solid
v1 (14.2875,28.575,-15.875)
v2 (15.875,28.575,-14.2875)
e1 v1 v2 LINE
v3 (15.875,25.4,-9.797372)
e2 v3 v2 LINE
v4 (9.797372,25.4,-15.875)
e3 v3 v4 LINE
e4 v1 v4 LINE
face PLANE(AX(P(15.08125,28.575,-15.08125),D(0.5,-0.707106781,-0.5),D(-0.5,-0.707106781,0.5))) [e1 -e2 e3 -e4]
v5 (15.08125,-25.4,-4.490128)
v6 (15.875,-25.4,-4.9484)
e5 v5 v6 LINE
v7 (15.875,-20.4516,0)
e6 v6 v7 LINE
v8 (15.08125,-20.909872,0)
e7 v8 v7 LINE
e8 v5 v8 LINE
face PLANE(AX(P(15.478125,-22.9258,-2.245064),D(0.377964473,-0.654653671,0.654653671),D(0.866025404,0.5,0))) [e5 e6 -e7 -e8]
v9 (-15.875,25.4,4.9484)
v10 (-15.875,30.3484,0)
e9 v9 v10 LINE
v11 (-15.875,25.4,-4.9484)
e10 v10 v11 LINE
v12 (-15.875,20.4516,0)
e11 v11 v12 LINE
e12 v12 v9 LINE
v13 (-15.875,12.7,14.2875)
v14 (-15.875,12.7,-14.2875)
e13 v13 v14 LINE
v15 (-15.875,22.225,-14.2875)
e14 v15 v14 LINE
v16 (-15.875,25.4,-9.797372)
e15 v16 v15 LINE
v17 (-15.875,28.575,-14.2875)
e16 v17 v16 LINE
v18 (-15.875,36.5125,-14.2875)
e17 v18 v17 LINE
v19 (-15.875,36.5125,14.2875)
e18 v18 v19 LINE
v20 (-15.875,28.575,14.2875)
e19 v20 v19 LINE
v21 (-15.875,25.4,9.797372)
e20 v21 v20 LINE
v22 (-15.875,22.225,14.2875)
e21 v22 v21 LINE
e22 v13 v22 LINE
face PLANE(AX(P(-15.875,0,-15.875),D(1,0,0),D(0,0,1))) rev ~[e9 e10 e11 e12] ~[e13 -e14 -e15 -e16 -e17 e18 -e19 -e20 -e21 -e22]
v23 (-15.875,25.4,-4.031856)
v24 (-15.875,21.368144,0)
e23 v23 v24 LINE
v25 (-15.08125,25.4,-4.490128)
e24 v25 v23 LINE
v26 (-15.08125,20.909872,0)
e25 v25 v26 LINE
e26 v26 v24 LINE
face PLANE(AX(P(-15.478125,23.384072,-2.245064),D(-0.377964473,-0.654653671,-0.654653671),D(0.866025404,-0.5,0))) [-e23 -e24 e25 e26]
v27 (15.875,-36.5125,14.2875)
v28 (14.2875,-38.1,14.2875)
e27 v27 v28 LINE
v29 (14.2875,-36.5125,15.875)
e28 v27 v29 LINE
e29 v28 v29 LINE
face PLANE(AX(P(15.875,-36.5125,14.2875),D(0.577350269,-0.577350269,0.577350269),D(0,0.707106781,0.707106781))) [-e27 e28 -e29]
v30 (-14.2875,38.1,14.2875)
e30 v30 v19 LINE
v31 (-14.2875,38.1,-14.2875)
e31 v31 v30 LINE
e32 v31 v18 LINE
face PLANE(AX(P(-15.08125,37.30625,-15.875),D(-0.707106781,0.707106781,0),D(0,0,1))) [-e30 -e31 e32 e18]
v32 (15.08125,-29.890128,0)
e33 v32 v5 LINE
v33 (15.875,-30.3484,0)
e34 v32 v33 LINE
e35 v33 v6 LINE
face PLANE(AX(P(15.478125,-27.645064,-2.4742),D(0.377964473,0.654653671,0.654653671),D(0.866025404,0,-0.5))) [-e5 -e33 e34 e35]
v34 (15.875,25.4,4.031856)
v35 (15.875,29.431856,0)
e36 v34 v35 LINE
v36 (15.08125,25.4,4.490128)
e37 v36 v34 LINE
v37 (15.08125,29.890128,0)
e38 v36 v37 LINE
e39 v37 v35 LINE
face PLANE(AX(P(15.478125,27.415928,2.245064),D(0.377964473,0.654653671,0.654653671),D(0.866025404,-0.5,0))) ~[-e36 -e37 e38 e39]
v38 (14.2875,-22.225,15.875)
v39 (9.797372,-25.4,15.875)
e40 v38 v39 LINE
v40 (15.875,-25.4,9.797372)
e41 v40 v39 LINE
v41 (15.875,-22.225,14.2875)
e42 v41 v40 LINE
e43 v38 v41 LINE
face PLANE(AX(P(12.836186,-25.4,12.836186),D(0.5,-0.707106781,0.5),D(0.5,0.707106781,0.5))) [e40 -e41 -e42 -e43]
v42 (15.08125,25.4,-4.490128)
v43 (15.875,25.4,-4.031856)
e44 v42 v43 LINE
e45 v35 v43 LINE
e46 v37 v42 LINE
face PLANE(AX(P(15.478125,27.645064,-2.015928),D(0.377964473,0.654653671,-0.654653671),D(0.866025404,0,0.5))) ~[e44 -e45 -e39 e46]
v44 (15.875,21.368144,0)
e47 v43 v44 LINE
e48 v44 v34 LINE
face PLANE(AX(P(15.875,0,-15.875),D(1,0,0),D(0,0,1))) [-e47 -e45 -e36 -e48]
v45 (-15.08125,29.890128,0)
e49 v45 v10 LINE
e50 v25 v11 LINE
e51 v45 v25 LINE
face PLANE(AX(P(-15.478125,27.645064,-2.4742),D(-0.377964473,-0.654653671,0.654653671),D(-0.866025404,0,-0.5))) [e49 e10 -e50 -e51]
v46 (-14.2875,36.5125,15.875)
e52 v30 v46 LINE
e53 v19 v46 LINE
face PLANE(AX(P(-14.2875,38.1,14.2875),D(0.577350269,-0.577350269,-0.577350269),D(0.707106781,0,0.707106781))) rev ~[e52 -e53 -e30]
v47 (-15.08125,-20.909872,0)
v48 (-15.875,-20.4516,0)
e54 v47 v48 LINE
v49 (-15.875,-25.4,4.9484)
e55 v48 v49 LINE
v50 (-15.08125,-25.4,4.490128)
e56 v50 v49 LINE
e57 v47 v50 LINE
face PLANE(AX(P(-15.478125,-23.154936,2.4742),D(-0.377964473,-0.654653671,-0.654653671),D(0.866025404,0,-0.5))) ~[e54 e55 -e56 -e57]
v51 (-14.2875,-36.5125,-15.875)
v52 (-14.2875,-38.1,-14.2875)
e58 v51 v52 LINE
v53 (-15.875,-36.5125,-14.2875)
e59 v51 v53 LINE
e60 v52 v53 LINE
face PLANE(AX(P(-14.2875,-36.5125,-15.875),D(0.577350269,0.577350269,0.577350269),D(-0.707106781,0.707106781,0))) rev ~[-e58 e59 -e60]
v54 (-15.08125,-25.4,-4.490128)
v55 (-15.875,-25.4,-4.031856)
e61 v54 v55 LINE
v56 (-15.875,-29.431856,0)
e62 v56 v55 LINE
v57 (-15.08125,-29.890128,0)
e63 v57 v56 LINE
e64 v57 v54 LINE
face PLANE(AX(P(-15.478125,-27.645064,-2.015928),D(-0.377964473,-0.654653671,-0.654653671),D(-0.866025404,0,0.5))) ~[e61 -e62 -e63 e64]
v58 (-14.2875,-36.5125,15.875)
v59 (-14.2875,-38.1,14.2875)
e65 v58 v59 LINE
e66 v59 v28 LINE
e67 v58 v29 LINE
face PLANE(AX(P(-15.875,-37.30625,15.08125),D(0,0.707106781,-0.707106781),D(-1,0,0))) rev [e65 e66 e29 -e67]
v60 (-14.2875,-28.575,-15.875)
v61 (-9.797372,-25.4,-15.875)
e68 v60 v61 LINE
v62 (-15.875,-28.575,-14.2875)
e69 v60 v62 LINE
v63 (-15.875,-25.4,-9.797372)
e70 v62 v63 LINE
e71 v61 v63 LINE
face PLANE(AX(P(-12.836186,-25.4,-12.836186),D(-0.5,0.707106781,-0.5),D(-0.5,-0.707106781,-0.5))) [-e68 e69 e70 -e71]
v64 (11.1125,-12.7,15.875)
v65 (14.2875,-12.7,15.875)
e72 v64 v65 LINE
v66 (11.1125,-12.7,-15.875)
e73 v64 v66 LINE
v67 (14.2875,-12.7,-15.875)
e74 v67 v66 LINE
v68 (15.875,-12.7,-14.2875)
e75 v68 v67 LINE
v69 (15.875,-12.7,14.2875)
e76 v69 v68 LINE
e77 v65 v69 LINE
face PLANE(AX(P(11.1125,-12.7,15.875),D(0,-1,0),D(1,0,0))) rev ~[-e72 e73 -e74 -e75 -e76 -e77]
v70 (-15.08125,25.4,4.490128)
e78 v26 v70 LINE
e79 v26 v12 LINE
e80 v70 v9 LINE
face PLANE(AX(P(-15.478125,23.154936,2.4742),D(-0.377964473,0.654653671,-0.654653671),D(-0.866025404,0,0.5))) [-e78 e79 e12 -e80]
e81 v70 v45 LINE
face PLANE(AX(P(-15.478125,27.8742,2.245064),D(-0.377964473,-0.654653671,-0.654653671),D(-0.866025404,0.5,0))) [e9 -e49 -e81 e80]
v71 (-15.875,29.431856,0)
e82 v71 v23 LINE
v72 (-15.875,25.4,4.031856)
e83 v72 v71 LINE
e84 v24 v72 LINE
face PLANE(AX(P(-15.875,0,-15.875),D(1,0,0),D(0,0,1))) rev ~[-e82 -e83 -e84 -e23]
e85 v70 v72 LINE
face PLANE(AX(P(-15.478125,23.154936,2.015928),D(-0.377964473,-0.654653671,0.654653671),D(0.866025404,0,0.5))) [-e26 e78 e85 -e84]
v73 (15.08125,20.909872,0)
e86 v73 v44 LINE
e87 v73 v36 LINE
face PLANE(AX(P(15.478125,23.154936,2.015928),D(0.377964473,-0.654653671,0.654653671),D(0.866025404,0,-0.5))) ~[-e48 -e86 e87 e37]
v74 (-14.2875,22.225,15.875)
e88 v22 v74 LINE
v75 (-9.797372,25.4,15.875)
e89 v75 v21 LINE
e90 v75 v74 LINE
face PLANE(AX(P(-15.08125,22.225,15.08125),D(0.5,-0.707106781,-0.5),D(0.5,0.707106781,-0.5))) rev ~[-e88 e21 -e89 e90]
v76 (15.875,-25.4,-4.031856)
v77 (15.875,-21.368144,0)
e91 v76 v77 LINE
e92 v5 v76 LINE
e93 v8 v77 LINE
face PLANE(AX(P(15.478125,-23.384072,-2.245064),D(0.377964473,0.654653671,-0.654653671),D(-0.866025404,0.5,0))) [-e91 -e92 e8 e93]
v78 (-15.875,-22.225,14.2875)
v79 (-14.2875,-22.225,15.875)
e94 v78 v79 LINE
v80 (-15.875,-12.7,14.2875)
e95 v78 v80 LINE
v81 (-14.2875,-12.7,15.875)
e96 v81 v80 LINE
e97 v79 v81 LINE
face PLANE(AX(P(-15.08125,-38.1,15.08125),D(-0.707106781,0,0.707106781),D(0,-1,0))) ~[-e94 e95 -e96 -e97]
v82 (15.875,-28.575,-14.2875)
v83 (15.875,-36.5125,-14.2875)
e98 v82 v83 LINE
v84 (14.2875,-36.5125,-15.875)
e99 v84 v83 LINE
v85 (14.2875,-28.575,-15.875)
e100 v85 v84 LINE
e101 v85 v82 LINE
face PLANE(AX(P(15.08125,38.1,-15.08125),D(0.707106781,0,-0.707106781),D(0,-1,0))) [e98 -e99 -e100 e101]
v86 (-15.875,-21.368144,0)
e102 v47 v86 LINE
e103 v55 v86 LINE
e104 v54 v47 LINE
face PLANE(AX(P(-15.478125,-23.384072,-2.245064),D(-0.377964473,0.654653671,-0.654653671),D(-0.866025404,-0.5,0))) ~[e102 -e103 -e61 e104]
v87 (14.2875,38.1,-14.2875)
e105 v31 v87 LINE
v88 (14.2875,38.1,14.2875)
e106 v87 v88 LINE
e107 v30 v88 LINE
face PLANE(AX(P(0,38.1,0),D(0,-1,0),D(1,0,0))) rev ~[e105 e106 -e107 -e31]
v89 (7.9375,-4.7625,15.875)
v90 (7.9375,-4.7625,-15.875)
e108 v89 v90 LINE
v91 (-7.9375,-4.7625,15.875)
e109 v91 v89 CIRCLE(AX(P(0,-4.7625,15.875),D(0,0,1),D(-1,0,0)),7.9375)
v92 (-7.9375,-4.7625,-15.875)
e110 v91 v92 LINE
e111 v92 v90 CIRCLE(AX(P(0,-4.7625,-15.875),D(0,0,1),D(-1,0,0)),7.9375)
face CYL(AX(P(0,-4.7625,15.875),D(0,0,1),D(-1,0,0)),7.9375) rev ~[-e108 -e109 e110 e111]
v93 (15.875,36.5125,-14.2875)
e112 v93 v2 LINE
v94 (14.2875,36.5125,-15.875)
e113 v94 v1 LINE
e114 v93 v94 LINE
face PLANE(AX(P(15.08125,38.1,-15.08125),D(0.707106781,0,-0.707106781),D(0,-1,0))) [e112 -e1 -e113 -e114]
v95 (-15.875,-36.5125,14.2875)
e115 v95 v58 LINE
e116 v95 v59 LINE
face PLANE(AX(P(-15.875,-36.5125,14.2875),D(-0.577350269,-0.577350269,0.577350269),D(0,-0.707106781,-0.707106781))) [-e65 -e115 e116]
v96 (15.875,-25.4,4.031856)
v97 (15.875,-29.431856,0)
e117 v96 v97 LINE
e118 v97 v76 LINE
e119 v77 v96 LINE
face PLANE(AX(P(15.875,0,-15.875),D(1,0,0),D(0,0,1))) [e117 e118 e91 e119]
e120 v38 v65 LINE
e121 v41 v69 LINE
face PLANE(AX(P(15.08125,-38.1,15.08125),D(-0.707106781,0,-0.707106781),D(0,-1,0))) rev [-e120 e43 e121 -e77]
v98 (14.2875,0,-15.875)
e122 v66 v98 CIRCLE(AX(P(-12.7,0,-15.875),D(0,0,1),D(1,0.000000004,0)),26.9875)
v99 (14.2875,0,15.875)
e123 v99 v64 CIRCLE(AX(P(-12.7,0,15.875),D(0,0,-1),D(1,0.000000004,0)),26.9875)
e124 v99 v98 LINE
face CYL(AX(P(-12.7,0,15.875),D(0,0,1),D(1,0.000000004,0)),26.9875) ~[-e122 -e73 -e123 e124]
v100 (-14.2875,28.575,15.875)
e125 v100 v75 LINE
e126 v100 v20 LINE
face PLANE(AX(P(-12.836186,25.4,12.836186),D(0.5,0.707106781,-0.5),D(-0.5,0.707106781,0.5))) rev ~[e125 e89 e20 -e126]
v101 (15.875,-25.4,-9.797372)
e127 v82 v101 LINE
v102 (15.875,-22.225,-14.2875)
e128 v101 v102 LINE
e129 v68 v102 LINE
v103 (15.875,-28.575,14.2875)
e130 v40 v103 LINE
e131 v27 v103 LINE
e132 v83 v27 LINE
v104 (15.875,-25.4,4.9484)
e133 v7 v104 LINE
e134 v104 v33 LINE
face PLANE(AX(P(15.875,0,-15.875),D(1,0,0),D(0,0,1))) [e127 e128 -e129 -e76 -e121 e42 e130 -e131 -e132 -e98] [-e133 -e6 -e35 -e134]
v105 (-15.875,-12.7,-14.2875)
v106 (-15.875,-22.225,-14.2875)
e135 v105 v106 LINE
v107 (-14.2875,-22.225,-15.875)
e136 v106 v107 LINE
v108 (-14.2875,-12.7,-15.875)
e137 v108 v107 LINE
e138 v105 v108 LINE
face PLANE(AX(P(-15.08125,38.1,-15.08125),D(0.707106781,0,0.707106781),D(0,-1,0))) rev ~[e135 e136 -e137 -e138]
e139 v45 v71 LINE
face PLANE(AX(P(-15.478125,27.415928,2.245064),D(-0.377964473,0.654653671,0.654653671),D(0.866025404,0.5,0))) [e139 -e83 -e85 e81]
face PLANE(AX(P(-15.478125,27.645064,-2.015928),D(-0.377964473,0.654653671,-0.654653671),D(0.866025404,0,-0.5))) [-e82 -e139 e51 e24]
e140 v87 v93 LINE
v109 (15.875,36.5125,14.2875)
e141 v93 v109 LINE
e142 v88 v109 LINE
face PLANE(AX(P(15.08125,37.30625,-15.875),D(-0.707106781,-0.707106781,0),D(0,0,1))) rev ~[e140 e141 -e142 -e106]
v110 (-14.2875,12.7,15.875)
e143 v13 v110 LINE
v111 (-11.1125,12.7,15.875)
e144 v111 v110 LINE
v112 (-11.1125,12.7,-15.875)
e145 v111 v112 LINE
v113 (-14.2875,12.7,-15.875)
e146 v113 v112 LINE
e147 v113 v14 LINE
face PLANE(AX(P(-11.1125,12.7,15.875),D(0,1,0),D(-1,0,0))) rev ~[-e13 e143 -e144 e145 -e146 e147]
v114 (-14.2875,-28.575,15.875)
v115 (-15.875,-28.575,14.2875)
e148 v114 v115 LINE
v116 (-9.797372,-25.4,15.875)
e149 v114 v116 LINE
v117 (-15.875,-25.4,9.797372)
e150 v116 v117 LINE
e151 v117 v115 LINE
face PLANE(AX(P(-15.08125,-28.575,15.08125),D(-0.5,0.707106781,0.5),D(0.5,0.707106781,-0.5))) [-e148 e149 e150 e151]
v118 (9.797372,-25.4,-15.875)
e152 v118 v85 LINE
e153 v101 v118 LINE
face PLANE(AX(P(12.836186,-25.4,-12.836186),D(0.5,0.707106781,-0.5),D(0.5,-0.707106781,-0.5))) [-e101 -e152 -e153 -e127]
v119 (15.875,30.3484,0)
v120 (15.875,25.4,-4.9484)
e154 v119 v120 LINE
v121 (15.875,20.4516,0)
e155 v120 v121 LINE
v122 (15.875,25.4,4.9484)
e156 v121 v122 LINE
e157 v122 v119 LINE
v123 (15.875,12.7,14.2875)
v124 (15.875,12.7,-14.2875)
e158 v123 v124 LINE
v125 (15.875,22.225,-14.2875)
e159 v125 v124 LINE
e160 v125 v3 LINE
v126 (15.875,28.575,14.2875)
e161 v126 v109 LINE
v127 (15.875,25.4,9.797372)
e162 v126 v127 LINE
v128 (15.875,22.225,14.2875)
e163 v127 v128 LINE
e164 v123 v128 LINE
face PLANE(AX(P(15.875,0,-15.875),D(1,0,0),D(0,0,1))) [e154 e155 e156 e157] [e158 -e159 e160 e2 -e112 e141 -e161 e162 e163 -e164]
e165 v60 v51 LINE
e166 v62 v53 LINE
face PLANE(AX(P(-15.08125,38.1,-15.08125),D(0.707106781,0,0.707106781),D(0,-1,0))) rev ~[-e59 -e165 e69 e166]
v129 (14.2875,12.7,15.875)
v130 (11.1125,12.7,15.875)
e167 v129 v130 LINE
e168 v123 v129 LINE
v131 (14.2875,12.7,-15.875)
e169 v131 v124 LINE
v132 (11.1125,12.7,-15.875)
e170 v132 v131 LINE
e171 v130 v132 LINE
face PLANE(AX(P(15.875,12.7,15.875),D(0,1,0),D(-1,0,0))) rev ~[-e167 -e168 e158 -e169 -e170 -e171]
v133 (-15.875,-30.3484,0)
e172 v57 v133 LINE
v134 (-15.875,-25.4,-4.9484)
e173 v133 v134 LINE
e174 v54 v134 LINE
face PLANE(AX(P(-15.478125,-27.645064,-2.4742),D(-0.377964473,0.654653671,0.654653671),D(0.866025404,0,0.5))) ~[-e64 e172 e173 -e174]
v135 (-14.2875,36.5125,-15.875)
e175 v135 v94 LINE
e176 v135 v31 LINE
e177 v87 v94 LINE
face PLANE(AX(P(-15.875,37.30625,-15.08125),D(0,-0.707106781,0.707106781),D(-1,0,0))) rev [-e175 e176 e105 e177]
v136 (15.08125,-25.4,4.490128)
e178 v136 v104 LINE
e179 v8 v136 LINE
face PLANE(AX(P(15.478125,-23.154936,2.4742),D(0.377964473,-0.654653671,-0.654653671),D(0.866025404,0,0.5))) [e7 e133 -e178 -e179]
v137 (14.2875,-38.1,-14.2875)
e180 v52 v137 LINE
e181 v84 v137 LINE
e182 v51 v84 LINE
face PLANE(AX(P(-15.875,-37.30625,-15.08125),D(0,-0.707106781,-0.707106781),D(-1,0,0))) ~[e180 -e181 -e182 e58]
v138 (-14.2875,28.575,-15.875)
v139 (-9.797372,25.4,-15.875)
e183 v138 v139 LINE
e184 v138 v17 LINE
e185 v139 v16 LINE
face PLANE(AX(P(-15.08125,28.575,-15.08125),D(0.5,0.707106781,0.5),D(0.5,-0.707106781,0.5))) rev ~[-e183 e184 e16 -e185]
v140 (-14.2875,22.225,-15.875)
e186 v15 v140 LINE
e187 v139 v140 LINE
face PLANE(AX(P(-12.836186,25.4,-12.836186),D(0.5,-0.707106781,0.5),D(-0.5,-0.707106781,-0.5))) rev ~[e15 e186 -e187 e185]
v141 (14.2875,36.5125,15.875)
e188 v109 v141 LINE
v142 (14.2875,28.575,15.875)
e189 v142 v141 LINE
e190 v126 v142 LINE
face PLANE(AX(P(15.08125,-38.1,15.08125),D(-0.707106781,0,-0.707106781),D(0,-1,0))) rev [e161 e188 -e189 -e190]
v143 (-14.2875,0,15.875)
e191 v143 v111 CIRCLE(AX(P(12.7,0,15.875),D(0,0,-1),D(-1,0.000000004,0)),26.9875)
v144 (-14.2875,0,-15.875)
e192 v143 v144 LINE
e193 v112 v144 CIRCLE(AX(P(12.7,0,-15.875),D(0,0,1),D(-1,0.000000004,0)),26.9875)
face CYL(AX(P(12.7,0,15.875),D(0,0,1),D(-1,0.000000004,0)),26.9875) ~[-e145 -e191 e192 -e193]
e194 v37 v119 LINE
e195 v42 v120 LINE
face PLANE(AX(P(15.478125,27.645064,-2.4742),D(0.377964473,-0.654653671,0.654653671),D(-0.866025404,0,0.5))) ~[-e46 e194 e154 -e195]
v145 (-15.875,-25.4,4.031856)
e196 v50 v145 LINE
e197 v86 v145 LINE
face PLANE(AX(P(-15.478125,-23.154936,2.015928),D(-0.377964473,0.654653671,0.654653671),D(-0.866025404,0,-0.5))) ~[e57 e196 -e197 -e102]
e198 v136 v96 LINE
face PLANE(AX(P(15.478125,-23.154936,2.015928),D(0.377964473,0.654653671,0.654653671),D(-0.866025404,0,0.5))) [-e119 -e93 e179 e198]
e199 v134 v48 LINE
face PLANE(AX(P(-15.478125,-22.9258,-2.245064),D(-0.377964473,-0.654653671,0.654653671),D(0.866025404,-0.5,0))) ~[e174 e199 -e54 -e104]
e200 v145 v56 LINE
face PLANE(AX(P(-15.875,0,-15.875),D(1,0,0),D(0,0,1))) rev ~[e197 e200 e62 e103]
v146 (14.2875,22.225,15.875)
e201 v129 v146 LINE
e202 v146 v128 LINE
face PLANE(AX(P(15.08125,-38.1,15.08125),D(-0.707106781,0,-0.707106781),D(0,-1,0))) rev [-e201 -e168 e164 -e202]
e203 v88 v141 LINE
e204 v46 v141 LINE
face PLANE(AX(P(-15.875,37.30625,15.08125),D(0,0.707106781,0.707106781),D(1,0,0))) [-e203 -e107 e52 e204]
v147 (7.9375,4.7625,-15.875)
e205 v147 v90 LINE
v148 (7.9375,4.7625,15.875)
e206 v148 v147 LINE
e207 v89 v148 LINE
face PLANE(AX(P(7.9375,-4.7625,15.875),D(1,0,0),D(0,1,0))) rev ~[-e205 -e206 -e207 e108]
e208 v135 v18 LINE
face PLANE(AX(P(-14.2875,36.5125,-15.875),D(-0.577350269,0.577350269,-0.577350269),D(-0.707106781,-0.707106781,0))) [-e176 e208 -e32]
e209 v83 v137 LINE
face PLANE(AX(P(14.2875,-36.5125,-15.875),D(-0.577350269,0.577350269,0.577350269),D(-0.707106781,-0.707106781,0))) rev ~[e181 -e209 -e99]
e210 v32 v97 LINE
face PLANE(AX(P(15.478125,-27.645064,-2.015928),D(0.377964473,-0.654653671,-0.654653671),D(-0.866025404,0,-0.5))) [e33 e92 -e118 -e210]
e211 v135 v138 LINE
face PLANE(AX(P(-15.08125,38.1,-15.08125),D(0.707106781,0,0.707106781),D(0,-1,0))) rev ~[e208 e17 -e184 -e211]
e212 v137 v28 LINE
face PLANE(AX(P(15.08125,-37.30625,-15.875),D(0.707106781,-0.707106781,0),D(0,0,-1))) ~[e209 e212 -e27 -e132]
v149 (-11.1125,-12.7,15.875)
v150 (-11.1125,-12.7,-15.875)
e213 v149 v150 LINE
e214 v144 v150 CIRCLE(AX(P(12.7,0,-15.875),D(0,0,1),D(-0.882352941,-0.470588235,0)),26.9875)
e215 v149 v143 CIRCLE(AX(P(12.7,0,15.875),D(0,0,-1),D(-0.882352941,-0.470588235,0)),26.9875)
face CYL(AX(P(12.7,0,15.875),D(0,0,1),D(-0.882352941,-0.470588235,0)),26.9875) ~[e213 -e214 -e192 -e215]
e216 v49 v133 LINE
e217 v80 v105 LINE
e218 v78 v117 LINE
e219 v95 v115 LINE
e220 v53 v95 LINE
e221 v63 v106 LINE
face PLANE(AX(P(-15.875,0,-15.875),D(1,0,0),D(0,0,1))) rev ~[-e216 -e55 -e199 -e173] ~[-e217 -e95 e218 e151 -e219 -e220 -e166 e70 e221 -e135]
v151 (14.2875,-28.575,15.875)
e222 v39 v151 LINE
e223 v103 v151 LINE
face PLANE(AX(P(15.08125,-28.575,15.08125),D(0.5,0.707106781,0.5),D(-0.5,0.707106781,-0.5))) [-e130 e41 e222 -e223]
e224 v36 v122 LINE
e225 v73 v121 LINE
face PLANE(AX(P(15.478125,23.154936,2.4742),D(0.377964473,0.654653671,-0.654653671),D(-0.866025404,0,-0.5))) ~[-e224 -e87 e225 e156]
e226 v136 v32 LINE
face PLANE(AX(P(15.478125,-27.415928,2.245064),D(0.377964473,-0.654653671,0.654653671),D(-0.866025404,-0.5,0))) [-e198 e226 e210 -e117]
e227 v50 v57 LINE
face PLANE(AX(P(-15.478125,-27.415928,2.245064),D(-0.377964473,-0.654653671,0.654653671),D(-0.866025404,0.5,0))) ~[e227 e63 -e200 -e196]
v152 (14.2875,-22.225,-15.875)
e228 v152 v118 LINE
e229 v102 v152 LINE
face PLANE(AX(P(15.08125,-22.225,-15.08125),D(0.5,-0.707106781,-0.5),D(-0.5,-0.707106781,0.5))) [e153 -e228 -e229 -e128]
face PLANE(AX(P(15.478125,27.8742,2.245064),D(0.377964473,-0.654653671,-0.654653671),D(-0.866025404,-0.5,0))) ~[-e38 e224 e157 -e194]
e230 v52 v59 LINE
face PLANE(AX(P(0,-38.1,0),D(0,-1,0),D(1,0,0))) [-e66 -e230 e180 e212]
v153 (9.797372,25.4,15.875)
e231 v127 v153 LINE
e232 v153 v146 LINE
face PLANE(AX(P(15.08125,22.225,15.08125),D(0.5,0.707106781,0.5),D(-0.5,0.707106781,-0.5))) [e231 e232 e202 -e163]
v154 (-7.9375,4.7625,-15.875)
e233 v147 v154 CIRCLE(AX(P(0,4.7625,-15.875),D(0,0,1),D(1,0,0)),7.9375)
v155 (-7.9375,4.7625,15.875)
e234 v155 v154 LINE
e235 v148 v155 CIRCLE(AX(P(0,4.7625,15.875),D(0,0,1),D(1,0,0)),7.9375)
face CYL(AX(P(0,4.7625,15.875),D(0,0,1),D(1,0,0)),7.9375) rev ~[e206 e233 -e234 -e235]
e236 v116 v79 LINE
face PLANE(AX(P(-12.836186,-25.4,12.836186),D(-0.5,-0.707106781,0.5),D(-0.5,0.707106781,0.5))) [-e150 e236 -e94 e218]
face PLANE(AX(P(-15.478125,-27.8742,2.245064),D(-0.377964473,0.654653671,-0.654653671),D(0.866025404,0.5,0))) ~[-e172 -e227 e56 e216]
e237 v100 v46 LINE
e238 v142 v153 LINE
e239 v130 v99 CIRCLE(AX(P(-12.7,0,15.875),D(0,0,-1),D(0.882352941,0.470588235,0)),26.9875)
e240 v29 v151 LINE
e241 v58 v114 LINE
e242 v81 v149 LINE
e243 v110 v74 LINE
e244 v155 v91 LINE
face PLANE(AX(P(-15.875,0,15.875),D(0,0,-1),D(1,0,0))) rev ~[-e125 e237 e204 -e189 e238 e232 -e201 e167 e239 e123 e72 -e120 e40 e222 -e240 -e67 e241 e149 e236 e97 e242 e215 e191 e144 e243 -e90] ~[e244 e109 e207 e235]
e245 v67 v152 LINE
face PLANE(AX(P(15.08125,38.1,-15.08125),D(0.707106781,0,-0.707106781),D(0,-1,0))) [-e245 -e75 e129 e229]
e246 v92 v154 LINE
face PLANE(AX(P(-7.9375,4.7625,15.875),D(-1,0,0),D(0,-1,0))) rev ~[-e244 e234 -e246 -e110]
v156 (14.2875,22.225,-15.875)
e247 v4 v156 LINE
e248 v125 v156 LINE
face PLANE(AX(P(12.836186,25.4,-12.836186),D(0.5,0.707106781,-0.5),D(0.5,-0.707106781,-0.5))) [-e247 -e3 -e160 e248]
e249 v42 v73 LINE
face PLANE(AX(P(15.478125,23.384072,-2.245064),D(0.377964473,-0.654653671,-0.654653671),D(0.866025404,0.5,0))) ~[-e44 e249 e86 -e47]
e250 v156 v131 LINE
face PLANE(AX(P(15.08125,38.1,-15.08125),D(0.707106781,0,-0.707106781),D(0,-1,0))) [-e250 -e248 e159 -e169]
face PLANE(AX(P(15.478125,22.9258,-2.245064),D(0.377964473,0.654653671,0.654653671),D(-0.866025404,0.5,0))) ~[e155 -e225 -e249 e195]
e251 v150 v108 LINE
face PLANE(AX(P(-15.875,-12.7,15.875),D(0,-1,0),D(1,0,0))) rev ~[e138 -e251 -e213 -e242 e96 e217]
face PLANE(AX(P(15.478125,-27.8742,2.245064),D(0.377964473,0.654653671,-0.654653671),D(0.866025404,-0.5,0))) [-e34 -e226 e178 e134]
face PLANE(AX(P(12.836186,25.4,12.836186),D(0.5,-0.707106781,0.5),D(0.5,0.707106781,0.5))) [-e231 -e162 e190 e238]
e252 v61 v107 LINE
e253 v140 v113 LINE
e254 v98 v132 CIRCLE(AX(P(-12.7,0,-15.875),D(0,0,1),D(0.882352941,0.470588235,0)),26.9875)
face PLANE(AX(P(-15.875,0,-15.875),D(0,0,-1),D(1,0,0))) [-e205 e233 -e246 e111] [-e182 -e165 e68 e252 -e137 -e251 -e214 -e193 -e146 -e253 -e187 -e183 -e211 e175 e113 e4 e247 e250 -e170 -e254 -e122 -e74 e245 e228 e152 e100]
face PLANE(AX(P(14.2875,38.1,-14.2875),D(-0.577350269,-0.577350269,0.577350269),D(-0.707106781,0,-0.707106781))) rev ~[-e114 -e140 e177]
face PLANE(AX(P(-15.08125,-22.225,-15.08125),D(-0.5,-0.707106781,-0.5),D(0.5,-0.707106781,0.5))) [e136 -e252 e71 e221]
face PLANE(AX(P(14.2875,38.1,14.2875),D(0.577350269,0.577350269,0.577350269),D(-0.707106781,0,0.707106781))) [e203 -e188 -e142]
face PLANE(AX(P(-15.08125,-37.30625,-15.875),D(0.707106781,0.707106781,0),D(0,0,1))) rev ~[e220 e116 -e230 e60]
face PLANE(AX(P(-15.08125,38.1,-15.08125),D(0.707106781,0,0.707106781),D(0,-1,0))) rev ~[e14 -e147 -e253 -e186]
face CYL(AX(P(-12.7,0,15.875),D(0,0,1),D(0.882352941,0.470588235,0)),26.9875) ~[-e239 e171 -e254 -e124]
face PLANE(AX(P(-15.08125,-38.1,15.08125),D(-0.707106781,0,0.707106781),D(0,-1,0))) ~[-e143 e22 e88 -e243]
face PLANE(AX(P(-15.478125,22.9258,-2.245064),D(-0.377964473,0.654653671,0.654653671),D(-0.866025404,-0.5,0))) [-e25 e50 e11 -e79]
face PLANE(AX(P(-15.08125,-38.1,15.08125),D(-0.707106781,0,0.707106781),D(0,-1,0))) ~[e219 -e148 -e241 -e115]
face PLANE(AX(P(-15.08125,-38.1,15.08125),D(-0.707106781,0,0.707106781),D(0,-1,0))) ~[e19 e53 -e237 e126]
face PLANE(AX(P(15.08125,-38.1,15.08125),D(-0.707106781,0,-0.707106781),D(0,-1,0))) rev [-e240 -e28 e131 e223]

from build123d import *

# Parameters (mm, degrees)
F0_W              = 31.75
F0_H              = 31.75
F1_DEPTH          = 38.1
F2_SIZE           = 1.5875
F4_DEPTH          = 31.751
F7_DEPTH          = 12.7
F10_DEPTH         = 12.7
F13_COPIES2_COUNT = 2


# Not quite as in the source:
# - a pattern or mirror of a feature is missing from the dataset's text; its kind, count and spacing are read off the source's solid


with BuildPart() as f1:
    # F0 (on Front) → F1 (new body, symmetric)
    with BuildSketch(Plane.XZ):
        Rectangle(F0_W, F0_H)
    extrude(amount=F1_DEPTH, both=True)

    # F2
    f2_edges = [f1.edges().sort_by_distance(p)[0] for p in [
        (0, -38.1, 15.875),
        (15.875, -38.1, 0),
        (15.875, 0, 15.875),
        (15.875, 0, -15.875),
        (-15.875, 0, 15.875),
        (-15.875, -38.1, 0),
        (0, -38.1, -15.875),
        (15.875, 38.1, 0),
        (-15.875, 38.1, 0),
        (0, 38.1, -15.875),
        (-15.875, 0, -15.875),
        (0, 38.1, 15.875),
    ]]
    chamfer(f2_edges, length=F2_SIZE)

    # F3 (on face) → F4 (cut, through all)
    with BuildSketch(Plane.XY.offset(15.875)):
        with BuildLine():
            Line((11.1125, -12.7), (14.2875, -12.7))
            Line((14.2875, -12.7), (14.2875, 1.197e-07))
            ThreePointArc((14.2875, 1.197e-07), (13.4817207372, -6.5454301226), (11.1125, -12.7))
        make_face()
        Polygon((14.2875, 1.197e-07), (14.2875, -12.7), (15.875, -12.7), (15.875, 12.7), (14.2875, 12.7), align=None)
        with BuildLine():
            ThreePointArc((11.1125, 12.7), (13.4817207082, 6.5454302387), (14.2875, 1.197e-07))
            Line((14.2875, 1.197e-07), (14.2875, 12.7))
            Line((14.2875, 12.7), (11.1125, 12.7))
        make_face()
        Polygon((-15.875, -12.7), (-14.2875, -12.7), (-14.2875, 1.197e-07), (-14.2875, 12.7), (-15.875, 12.7), align=None)
        with BuildLine():
            Line((-14.2875, 1.197e-07), (-14.2875, -12.7))
            Line((-14.2875, -12.7), (-11.1125, -12.7))
            ThreePointArc((-11.1125, -12.7), (-13.4817207372, -6.5454301226), (-14.2875, 1.197e-07))
        make_face()
        with BuildLine():
            Line((-14.2875, 12.7), (-14.2875, 1.197e-07))
            ThreePointArc((-14.2875, 1.197e-07), (-13.4817207082, 6.5454302387), (-11.1125, 12.7))
            Line((-11.1125, 12.7), (-14.2875, 12.7))
        make_face()
        with BuildLine():
            Line((-7.9375, 4.7625), (-7.9375, -4.7625))
            ThreePointArc((-7.9375, -4.7625), (0, -12.7), (7.9375, -4.7625))
            Line((7.9375, -4.7625), (7.9375, 4.7625))
            ThreePointArc((7.9375, 4.7625), (0, 12.7), (-7.9375, 4.7625))
        make_face()
    extrude(amount=-F4_DEPTH, mode=Mode.SUBTRACT)

    # F6 (on face) → F7 (cut, symmetric)
    with BuildSketch(Plane(origin=(0, 0, 0), x_dir=(0, 1, 0), z_dir=(0.7071067812, 0, 0.7071067812))):
        Polygon((-25.4, 18.1531082875), (-22.225, 21.3281082875), (-28.575, 21.3281082875), align=None)
        Polygon((-25.4, -18.1531082875), (-28.575, -21.3281082875), (-22.225, -21.3281082875), align=None)
        Polygon((22.225, -21.3281082875), (28.575, -21.3281082875), (25.4, -18.1531082875), align=None)
        Polygon((28.575, 21.3281082875), (22.225, 21.3281082875), (25.4, 18.1531082875), align=None)
    extrude(amount=F7_DEPTH, both=True, mode=Mode.SUBTRACT)

    # F9 (on face) → F10 (cut, symmetric)
    with BuildSketch(Plane(origin=(0, 0, 0), x_dir=(0, 1, 0), z_dir=(0.7071067812, 0, -0.7071067812))):
        Polygon((-25.4, 18.1531082875), (-22.225, 21.3281082875), (-28.575, 21.3281082875), align=None)
        Polygon((-28.575, -21.3281082875), (-22.225, -21.3281082875), (-25.4, -18.1531082875), align=None)
        Polygon((28.575, 21.3281082875), (22.225, 21.3281082875), (25.4, 18.1531082875), align=None)
        Polygon((25.4, -18.1531082875), (22.225, -21.3281082875), (28.575, -21.3281082875), align=None)
    extrude(amount=F10_DEPTH, both=True, mode=Mode.SUBTRACT)

    # F13: sweep along a path in F11
    with BuildLine(Plane(origin=(-15.875, 0, 0), x_dir=(0, -1, 0), z_dir=(-1, 0, 0))) as f13_path:
        Line((-25.4, 4.4901280605), (-29.8901280605, 0))
        Line((-29.8901280605, 0), (-25.4, -4.4901280605))
        Line((-25.4, -4.4901280605), (-20.9098719395, 0))
        Line((-20.9098719395, 0), (-25.4, 4.4901280605))
    # F12 (on Top) → F13 (sweep, cut)
    with BuildSketch(Plane.XY):
        Polygon((-15.875, 29.4318562844), (-15.08125, 29.8901280605), (-15.875, 30.3483998367), align=None)
    f13 = sweep(path=f13_path.line, transition=Transition.RIGHT, mode=Mode.SUBTRACT)

    # F13_copies: F13 across plane
    add(f13.mirror(Plane(origin=(0, 0, 0), x_dir=(0, 0, 1), z_dir=(1, 0, 0))), mode=Mode.SUBTRACT)

    # F13_copies1: F13 across plane
    add(f13.mirror(Plane(origin=(0, 0, 0), x_dir=(0, 0, -1), z_dir=(0, -1, 0))), mode=Mode.SUBTRACT)

    # F13_copies2: F13 ×2 about axis
    f13_copies2_axis = Axis((0, 0, 0), (0, 0, 1))
    for i in range(1, F13_COPIES2_COUNT):
        add(f13.rotate(f13_copies2_axis, i * 360 / F13_COPIES2_COUNT), mode=Mode.SUBTRACT)


solid = f1.part
